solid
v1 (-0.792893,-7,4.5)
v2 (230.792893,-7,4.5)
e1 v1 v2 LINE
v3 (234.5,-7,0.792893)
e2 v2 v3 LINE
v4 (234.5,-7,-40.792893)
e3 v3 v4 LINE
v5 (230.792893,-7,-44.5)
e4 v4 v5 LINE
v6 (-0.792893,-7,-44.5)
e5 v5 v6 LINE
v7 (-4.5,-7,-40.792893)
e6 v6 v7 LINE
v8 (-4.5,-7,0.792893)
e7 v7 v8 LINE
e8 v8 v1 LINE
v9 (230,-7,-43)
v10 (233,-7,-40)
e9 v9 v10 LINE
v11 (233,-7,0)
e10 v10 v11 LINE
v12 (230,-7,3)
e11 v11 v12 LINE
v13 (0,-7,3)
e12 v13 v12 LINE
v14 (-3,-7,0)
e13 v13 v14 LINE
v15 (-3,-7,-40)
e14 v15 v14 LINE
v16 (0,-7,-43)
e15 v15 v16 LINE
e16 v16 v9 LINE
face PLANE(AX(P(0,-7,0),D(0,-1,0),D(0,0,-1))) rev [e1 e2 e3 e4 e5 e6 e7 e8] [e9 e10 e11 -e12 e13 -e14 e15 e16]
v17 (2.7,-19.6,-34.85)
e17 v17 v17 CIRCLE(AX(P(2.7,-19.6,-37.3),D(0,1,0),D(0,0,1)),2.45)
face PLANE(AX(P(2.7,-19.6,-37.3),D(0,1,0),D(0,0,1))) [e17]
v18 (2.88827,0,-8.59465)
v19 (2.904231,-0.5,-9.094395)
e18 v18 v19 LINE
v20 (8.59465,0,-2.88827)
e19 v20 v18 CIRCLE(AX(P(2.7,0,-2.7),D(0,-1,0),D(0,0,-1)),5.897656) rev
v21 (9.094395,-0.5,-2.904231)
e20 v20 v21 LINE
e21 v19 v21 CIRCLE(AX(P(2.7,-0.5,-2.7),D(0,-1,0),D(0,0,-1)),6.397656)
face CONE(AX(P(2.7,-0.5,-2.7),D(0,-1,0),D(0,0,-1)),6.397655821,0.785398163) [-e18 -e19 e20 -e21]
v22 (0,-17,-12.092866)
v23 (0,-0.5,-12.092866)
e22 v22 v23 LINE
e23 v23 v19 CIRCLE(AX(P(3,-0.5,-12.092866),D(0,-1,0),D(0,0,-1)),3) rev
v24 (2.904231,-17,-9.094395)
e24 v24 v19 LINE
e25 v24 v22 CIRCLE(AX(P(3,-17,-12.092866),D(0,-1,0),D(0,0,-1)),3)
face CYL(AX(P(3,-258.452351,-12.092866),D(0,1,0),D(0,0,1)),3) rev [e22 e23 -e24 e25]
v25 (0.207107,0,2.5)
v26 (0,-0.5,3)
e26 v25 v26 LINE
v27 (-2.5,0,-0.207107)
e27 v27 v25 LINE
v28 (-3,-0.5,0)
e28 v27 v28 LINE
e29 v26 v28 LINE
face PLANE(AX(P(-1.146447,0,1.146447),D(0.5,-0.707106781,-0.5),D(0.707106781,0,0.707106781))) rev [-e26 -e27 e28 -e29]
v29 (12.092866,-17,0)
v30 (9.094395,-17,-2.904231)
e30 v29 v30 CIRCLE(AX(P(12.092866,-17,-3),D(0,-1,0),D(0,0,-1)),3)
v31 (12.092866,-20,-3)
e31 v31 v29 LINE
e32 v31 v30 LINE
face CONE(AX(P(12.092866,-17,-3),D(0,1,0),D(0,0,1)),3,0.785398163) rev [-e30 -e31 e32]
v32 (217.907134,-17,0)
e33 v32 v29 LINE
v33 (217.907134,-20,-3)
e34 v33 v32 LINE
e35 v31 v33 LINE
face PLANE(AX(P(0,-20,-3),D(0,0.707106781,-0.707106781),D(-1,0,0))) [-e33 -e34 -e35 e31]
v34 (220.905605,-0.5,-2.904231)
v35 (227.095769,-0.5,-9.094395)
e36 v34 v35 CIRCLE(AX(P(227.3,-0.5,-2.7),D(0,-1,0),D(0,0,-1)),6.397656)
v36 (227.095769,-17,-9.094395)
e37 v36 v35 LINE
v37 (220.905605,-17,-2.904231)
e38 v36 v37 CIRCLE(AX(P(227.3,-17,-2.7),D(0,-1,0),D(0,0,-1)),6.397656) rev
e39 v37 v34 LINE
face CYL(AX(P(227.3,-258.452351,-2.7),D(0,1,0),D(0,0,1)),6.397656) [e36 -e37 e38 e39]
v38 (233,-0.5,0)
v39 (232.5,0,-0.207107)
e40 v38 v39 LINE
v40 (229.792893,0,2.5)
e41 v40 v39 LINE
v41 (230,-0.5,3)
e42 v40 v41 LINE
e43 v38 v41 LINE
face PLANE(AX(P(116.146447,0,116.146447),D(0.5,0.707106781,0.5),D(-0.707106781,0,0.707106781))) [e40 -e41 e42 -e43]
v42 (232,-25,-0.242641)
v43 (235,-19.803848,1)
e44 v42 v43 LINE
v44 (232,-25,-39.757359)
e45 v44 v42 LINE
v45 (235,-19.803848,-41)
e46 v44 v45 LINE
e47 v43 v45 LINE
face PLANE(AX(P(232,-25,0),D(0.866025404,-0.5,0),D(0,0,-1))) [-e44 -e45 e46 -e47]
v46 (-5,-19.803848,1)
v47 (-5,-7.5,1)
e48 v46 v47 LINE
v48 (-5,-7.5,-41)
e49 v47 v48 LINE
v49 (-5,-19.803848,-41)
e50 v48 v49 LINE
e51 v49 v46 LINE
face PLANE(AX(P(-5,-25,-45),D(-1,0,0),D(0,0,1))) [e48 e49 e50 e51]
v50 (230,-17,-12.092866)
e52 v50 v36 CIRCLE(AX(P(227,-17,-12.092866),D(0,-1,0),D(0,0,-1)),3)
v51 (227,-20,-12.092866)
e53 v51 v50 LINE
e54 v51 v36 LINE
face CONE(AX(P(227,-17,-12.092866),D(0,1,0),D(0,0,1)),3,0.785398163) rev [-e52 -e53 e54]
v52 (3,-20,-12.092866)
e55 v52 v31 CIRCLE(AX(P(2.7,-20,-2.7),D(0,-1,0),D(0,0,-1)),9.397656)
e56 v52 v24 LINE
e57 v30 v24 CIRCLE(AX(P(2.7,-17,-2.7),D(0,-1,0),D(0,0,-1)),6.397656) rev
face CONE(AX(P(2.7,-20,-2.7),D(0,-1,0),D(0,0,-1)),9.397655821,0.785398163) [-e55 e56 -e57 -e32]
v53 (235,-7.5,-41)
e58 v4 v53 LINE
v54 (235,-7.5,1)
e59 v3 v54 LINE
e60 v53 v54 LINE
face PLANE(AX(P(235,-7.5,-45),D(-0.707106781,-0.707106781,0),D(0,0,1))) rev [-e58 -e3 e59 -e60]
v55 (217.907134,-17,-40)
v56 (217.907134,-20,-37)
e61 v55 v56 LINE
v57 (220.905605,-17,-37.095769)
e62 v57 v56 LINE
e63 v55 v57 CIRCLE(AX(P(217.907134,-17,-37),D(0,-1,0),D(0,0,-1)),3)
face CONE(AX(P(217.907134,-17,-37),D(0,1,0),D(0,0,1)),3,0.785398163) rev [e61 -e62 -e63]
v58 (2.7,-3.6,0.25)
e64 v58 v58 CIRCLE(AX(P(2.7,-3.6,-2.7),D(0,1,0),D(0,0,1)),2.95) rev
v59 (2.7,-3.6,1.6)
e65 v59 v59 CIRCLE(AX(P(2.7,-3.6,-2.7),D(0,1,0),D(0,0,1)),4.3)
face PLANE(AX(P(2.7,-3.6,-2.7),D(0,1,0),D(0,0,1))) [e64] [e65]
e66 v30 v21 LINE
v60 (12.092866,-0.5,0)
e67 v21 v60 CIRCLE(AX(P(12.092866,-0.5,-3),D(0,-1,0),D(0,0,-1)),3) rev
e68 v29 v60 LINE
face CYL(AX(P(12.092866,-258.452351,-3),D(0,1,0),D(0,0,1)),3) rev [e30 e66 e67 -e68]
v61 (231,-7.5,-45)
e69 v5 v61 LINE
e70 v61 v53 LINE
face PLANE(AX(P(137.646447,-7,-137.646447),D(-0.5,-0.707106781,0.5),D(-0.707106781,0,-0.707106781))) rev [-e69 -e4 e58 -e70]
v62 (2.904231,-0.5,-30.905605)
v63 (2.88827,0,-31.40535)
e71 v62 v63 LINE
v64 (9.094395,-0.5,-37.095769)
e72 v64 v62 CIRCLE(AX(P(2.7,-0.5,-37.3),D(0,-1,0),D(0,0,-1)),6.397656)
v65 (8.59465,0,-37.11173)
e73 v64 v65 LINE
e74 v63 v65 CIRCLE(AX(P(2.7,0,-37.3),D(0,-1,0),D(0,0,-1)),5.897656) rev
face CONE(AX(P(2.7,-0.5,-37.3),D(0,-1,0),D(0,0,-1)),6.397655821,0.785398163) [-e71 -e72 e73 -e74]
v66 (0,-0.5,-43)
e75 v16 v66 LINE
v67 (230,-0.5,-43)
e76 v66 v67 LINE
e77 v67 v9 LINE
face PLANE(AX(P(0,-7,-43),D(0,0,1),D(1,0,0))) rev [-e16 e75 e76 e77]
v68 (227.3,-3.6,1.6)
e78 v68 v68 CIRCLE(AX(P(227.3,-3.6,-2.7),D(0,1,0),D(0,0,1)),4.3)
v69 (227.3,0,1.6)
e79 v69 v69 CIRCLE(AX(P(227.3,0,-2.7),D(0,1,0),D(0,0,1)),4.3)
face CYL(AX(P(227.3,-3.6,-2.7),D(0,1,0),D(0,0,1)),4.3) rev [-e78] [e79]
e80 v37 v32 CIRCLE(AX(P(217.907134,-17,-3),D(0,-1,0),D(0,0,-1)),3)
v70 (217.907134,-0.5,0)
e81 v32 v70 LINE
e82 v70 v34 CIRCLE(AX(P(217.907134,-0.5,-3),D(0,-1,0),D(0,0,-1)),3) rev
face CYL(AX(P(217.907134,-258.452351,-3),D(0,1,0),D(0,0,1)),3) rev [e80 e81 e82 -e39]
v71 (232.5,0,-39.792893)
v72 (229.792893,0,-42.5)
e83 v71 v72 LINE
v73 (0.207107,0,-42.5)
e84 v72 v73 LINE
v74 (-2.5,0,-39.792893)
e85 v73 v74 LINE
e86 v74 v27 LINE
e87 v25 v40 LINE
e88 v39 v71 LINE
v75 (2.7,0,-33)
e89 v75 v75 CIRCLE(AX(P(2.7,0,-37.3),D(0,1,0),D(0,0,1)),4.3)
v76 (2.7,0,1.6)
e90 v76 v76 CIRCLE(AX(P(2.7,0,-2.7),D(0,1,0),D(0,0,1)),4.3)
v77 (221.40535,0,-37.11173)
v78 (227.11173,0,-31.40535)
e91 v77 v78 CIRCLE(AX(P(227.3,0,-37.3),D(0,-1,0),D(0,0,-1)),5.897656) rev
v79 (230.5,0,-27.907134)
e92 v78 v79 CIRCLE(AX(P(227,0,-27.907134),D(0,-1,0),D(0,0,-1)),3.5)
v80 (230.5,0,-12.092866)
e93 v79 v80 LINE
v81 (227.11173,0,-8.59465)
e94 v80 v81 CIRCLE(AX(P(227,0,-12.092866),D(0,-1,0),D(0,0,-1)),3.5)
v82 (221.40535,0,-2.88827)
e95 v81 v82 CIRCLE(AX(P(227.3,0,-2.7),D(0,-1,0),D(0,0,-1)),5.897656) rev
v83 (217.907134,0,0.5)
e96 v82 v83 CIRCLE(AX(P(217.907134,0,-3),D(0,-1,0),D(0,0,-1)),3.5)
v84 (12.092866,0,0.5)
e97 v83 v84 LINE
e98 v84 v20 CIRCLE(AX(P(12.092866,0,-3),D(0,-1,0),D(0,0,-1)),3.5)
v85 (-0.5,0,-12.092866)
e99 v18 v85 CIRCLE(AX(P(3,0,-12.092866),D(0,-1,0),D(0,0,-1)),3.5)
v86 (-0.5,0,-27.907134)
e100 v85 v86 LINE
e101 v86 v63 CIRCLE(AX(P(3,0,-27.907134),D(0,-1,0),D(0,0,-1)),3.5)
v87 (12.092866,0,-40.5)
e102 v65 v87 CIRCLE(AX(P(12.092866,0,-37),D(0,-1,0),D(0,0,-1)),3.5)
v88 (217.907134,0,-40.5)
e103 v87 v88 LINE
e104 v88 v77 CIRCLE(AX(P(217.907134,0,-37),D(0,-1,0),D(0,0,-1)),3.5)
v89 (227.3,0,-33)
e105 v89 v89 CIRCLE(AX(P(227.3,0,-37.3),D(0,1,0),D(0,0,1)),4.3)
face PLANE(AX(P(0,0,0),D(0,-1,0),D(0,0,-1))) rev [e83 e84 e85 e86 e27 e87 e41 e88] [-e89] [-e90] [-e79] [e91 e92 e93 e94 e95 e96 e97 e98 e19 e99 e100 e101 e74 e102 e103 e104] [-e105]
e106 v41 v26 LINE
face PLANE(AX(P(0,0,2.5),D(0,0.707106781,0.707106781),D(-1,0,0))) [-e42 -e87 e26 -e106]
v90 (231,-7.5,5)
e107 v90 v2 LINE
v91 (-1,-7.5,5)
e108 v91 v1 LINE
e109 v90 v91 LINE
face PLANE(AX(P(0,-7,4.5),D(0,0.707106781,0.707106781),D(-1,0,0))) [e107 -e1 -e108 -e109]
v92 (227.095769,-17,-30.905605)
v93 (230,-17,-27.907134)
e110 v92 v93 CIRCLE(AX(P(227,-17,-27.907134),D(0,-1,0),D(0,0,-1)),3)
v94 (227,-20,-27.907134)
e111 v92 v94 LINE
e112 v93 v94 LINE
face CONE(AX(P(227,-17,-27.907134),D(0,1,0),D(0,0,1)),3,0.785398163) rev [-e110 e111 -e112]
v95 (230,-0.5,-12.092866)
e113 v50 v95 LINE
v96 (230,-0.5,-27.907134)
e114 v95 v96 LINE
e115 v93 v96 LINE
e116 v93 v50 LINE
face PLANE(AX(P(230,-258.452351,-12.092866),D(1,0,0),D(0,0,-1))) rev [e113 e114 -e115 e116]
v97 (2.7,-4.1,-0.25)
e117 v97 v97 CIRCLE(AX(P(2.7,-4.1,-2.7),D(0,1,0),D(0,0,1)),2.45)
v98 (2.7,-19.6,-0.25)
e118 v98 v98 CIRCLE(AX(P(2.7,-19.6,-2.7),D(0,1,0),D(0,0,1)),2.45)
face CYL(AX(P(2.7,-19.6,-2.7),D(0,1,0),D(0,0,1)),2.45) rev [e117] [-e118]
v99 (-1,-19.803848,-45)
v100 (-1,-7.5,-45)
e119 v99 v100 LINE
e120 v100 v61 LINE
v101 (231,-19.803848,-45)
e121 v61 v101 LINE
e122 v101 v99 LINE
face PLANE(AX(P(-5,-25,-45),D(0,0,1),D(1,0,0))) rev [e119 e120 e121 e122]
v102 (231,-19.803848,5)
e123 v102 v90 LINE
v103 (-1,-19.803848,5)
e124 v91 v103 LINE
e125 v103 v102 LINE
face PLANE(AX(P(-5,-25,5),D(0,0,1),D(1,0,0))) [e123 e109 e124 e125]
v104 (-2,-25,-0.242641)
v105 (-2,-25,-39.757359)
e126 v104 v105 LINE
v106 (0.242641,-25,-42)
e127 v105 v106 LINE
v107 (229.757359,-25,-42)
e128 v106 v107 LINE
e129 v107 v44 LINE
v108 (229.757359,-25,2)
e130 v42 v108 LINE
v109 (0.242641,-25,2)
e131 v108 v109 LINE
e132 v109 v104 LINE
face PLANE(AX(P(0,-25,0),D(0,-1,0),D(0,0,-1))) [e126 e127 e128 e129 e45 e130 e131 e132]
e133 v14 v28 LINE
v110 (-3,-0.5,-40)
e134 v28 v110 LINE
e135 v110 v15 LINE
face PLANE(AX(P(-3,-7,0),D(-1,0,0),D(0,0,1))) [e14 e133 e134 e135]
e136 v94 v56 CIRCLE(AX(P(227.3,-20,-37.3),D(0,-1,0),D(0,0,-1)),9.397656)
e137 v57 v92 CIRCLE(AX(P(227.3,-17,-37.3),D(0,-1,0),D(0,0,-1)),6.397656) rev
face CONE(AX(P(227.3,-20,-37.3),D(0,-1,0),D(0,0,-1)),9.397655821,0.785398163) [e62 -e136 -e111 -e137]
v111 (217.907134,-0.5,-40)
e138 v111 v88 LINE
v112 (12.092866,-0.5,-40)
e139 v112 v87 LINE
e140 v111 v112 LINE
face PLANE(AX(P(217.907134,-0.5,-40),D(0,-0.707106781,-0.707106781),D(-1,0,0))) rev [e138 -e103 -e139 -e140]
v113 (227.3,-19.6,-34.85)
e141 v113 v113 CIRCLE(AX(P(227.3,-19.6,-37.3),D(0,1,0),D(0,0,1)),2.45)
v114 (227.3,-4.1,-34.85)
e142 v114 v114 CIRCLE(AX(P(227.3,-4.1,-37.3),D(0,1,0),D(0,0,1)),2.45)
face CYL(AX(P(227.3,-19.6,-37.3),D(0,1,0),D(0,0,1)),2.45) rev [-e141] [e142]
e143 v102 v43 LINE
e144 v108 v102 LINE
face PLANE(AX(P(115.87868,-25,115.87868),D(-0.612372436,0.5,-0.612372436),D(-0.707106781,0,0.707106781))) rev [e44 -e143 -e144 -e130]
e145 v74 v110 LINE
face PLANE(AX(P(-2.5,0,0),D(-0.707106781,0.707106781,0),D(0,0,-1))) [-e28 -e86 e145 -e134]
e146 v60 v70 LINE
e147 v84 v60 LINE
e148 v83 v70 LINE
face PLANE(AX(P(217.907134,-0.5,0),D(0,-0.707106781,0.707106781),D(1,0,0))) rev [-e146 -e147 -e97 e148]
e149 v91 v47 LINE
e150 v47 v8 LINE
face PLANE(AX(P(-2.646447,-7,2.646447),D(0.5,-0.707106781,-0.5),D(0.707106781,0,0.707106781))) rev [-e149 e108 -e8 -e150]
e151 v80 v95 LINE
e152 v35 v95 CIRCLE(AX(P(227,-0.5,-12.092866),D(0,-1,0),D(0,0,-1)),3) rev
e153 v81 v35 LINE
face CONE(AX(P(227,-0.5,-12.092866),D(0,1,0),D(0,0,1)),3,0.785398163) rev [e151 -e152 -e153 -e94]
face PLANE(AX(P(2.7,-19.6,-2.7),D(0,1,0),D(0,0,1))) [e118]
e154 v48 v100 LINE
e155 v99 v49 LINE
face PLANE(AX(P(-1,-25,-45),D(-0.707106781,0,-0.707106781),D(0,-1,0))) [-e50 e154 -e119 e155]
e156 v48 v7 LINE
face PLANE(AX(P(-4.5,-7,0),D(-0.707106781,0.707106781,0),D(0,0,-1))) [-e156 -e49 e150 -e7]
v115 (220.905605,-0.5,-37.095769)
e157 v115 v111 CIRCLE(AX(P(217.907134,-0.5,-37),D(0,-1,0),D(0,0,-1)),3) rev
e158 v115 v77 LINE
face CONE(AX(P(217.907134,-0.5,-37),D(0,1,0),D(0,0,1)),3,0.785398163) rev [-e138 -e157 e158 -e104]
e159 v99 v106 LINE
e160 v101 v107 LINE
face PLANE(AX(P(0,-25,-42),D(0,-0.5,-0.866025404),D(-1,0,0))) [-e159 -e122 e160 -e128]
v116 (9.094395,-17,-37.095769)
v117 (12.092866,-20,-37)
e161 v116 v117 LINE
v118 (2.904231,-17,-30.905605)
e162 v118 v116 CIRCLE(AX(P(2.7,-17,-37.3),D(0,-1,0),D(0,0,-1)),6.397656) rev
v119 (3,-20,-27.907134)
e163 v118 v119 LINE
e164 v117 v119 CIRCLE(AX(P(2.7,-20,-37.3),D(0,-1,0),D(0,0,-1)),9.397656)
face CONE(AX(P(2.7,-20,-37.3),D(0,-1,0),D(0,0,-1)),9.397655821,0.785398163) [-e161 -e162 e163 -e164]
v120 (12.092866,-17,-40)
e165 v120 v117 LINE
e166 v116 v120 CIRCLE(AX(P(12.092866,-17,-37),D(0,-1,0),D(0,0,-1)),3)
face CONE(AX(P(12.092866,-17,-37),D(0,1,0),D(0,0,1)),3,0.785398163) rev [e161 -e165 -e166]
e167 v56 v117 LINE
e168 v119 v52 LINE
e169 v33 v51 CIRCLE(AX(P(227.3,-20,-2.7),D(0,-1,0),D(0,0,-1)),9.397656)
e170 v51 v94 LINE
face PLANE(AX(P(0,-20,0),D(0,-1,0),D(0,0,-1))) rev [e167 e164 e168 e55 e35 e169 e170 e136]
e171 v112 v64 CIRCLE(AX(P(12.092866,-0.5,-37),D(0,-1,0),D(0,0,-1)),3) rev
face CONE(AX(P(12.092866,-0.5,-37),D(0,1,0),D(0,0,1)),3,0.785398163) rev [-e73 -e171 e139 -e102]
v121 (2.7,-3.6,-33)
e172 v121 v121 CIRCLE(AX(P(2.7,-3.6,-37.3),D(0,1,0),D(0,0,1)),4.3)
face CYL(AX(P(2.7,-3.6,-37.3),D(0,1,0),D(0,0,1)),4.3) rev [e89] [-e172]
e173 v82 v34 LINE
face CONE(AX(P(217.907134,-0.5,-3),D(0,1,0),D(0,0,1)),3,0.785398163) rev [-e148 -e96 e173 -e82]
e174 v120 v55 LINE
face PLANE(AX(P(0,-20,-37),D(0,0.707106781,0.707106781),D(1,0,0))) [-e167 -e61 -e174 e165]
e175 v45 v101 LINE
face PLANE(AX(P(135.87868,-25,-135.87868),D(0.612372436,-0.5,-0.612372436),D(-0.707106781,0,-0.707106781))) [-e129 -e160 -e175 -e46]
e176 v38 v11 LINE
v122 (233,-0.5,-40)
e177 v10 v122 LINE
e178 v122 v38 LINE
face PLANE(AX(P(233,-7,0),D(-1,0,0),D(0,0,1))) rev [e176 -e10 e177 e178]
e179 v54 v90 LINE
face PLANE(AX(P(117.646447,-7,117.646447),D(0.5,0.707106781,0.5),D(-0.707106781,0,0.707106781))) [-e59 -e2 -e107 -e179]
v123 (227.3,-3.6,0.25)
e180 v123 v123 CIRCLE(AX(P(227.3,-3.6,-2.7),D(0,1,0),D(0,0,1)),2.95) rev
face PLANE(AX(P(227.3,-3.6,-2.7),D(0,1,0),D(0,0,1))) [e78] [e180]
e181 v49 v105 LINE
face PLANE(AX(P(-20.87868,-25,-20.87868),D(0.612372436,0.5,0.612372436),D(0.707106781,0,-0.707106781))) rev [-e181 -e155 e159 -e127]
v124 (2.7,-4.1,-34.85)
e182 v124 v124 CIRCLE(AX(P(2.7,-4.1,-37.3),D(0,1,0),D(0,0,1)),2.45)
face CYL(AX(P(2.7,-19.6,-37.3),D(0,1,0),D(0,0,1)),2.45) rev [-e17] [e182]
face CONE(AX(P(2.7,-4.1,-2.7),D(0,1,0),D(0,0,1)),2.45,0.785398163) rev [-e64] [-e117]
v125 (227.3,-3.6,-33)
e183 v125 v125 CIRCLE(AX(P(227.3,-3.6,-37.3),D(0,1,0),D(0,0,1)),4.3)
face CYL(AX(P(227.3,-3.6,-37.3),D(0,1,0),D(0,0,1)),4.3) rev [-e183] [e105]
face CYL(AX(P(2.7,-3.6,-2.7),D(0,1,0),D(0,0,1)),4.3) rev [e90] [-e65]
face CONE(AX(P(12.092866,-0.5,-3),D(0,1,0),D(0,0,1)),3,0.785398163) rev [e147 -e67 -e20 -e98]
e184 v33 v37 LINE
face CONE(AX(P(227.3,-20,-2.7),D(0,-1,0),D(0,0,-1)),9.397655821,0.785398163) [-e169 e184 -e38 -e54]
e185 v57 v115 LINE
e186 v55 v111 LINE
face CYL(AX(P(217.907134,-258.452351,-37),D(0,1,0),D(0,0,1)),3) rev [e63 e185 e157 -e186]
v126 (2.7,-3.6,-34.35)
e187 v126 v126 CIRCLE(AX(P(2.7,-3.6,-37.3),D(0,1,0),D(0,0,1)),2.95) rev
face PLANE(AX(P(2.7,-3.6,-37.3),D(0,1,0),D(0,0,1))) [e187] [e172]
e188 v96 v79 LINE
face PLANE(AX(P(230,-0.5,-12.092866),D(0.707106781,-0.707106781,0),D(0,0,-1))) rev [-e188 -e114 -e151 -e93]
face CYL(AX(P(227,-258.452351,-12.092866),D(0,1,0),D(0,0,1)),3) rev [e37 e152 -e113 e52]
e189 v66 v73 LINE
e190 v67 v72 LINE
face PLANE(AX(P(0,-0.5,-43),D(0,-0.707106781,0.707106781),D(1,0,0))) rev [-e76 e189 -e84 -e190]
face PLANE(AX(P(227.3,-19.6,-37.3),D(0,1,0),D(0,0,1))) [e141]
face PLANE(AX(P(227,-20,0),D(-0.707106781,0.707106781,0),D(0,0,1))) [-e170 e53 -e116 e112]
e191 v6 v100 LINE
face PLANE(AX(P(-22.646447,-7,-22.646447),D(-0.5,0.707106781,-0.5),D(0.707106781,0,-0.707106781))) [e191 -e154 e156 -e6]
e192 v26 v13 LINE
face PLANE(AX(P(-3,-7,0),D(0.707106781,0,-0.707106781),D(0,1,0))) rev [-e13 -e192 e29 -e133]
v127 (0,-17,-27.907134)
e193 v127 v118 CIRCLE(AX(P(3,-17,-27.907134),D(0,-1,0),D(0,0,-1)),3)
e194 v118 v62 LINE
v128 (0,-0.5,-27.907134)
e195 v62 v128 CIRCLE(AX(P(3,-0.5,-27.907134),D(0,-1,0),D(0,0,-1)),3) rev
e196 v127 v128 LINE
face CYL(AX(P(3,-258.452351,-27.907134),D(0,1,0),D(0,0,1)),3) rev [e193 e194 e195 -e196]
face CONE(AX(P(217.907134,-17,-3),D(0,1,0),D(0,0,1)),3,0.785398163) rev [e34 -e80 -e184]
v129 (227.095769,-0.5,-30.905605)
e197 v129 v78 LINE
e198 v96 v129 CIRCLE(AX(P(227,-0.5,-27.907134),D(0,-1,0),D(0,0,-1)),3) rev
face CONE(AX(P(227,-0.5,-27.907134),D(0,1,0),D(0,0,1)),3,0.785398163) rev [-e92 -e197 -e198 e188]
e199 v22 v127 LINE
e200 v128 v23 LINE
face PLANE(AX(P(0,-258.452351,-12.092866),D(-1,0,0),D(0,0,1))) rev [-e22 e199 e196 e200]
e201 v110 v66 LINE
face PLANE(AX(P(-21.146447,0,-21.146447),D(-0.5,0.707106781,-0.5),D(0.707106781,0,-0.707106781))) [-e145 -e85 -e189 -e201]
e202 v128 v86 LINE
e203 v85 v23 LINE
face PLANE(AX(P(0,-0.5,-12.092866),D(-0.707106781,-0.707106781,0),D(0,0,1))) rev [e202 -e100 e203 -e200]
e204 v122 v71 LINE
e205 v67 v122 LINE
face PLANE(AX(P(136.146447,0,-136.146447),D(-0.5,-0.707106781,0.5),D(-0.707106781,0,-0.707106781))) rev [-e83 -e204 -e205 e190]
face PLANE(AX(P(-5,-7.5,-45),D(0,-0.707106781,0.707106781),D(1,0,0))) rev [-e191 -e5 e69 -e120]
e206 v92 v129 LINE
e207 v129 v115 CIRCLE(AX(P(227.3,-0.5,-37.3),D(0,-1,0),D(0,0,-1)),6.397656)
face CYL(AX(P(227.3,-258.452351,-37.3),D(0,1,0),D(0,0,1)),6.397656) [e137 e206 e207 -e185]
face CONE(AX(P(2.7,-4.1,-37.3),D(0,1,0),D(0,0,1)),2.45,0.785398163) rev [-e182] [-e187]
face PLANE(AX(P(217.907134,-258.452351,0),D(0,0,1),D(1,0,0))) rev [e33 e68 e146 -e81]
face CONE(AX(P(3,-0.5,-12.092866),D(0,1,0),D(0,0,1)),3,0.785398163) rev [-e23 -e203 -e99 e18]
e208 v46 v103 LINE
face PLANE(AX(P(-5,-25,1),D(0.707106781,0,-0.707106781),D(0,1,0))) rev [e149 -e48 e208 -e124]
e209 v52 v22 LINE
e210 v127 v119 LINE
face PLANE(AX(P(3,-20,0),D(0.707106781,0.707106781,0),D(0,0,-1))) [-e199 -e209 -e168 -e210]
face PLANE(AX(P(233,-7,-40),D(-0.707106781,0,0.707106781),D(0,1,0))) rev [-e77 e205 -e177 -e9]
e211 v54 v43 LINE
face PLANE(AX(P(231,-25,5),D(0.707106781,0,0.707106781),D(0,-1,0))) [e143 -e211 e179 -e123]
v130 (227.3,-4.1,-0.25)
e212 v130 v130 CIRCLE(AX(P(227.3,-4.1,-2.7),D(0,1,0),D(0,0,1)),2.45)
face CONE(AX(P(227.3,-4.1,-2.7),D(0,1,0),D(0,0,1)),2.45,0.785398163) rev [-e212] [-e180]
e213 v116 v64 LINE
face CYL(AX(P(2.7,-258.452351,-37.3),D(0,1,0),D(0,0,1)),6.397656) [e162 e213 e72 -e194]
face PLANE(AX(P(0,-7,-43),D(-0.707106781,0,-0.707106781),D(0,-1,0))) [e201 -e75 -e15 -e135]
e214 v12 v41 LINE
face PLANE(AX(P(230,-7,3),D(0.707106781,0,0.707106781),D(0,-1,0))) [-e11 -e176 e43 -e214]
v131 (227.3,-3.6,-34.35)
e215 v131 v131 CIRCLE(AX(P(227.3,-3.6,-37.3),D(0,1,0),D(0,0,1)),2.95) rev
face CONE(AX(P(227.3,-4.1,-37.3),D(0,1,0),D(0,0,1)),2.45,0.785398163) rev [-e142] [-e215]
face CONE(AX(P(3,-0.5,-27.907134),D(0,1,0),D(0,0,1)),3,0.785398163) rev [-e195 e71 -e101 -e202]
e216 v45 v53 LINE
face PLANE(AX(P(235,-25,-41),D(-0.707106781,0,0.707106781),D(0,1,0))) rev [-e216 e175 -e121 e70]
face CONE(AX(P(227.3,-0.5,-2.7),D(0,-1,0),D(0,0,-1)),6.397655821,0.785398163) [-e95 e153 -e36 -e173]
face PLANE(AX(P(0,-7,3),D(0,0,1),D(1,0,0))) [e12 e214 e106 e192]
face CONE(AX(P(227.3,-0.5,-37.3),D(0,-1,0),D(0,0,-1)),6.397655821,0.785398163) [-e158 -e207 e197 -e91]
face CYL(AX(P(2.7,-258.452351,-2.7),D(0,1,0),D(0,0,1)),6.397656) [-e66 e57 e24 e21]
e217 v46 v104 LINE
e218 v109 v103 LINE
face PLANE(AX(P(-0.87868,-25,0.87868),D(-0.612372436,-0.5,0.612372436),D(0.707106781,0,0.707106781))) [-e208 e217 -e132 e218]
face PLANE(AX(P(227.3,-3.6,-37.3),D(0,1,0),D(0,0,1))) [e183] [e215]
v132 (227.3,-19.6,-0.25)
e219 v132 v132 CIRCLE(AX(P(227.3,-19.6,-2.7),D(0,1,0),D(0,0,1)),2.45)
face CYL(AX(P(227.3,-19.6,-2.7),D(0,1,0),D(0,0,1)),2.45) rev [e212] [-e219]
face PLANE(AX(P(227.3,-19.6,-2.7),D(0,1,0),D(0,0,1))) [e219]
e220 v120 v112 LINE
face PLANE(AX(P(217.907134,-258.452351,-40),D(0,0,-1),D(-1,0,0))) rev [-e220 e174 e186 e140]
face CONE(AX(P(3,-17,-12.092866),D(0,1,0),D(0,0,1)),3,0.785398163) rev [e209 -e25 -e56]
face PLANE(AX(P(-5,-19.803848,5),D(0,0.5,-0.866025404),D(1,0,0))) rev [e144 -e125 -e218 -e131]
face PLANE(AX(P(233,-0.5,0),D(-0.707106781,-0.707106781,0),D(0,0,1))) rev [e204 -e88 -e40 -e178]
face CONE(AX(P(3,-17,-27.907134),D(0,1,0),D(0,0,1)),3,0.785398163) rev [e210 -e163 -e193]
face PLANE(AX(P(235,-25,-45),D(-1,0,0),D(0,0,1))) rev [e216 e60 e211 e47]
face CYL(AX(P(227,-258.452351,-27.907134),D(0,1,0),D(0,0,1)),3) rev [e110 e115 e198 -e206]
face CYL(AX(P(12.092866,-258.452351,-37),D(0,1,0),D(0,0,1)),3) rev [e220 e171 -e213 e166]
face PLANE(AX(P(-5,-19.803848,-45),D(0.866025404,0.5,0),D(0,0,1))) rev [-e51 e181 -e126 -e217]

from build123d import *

# Parameters (mm, degrees)
SKETCH1_W             = 240
SKETCH1_H             = 50
BOSS_EXTRUDE1_DEPTH   = 25
SKETCH6_OUTSIDE_W     = 291.284
SKETCH6_OUTSIDE_H     = 101.284
SKETCH6_OUTSIDE_W_2   = 236
SKETCH6_OUTSIDE_H_2   = 46
CUT_EXTRUDE3_DEPTH    = 7
CHAMFER6_SIZE         = 3
CHAMFER5_SIZE         = 4
SKETCH6_9_OUTSIDE_W   = 291.284
SKETCH6_9_OUTSIDE_H   = 101.284
SKETCH6_9_OUTSIDE_W_2 = 236
SKETCH6_9_OUTSIDE_H_2 = 46
SKETCH6_9_OUTSIDE_R   = 4.3
CUT_EXTRUDE5_DEPTH    = 3.6
SKETCH16_R            = 2.45
CUT_EXTRUDE10_DEPTH   = 16
CHAMFER8_SIZE         = 0.5
CHAMFER9_SIZE         = 3
CHAMFER9_SIZE2        = 5.196152423
CHAMFER11_SIZE        = 0.5
CHAMFER12_SIZE        = 0.5
CUT_EXTRUDE11_DEPTH   = 20
CHAMFER13_SIZE        = 0.5
CHAMFER14_SIZE        = 3


with BuildPart() as part:
    # Sketch1 → Boss-Extrude1 (new body)
    with BuildSketch(Plane(origin=(0, 0, 0), x_dir=(1, 0, 0), z_dir=(0, 1, 0))):
        with Locations((115, 20)):
            Rectangle(SKETCH1_W, SKETCH1_H)
    extrude(amount=-BOSS_EXTRUDE1_DEPTH)

    # Sketch6 outside → Cut-Extrude3 (cut)
    with BuildSketch(Plane(origin=(0, 0, 0), x_dir=(1, 0, 0), z_dir=(0, 1, 0))):
        with Locations((115, 20)):
            Rectangle(SKETCH6_OUTSIDE_W, SKETCH6_OUTSIDE_H)
        with Locations((115, 20)):
            Rectangle(SKETCH6_OUTSIDE_W_2, SKETCH6_OUTSIDE_H_2, mode=Mode.SUBTRACT)
    extrude(amount=-CUT_EXTRUDE3_DEPTH, mode=Mode.SUBTRACT)

    # Chamfer6
    chamfer6_edges = [part.edges().sort_by_distance(p)[0] for p in [
        (-3, -3.5, -43),
        (233, -3.5, -43),
        (233, -3.5, 3),
        (-3, -3.5, 3),
    ]]
    chamfer(chamfer6_edges, length=CHAMFER6_SIZE)

    # Chamfer5
    chamfer5_edges = [part.edges().sort_by_distance(p)[0] for p in [
        (-5, -16, 5),
        (-5, -16, -45),
        (235, -16, -45),
        (235, -16, 5),
    ]]
    chamfer(chamfer5_edges, length=CHAMFER5_SIZE)

    # Sketch6<9> outside → Cut-Extrude5 (cut)
    # profile 1 of 5: a face of its own
    with BuildSketch(Plane(origin=(0, 0, 0), x_dir=(1, 0, 0), z_dir=(0, 1, 0))):
        with Locations((115, 20)):
            Rectangle(SKETCH6_9_OUTSIDE_W, SKETCH6_9_OUTSIDE_H)
        with Locations((115, 20)):
            Rectangle(SKETCH6_9_OUTSIDE_W_2, SKETCH6_9_OUTSIDE_H_2, mode=Mode.SUBTRACT)
    # profile 2 of 5: a face of its own
    with BuildSketch(Plane(origin=(0, 0, 0), x_dir=(1, 0, 0), z_dir=(0, 1, 0))):
        with Locations(Location((2.7, 37.3, 0), (0, 0, 270))):
            Circle(SKETCH6_9_OUTSIDE_R)
    # profile 3 of 5: a face of its own
    with BuildSketch(Plane(origin=(0, 0, 0), x_dir=(1, 0, 0), z_dir=(0, 1, 0))):
        with Locations(Location((227.3, 37.3, 0), (0, 0, 270))):
            Circle(SKETCH6_9_OUTSIDE_R)
    # profile 4 of 5: a face of its own
    with BuildSketch(Plane(origin=(0, 0, 0), x_dir=(1, 0, 0), z_dir=(0, 1, 0))):
        with Locations(Location((227.3, 2.7, 0), (0, 0, 270))):
            Circle(SKETCH6_9_OUTSIDE_R)
    # profile 5 of 5: a face of its own
    with BuildSketch(Plane(origin=(0, 0, 0), x_dir=(1, 0, 0), z_dir=(0, 1, 0))):
        with Locations(Location((2.7, 2.7, 0), (0, 0, 270))):
            Circle(SKETCH6_9_OUTSIDE_R)
    extrude(amount=-CUT_EXTRUDE5_DEPTH, mode=Mode.SUBTRACT)

    # Sketch16 → Cut-Extrude10 (cut)
    with BuildSketch(Plane(origin=(0, -3.6, 0), x_dir=(1, 0, 0), z_dir=(0, 1, 0))):
        with Locations(Location((2.7, 2.7, 0), (0, 0, 270))):
            Circle(SKETCH16_R)
        with Locations(Location((2.7, 37.3, 0), (0, 0, 270))):
            Circle(SKETCH16_R)
        with Locations(Location((227.3, 37.3, 0), (0, 0, 270))):
            Circle(SKETCH16_R)
        with Locations(Location((227.3, 2.7, 0), (0, 0, 270))):
            Circle(SKETCH16_R)
    extrude(amount=-CUT_EXTRUDE10_DEPTH, mode=Mode.SUBTRACT)

    # Chamfer8
    chamfer8_edges = [part.edges().sort_by_distance(p)[0] for p in [
        (227.3, -3.6, -5.15),
        (227.3, -3.6, -39.75),
        (2.7, -3.6, -39.75),
        (2.7, -3.6, -5.15),
    ]]
    chamfer(chamfer8_edges, length=CHAMFER8_SIZE)

    # Chamfer9
    chamfer9_edges = [part.edges().sort_by_distance(p)[0] for p in [
        (115, -25, -45),
        (-5, -25, -20),
        (115, -25, 5),
        (235, -25, -20),
        (233, -25, -43),
        (233, -25, 3),
        (-3, -25, 3),
        (-3, -25, -43),
    ]]
    chamfer9_side = [part.faces().sort_by_distance(p)[0] for p in [
        (115, -25, -20),
    ]]
    chamfer(chamfer9_edges, length=CHAMFER9_SIZE, length2=CHAMFER9_SIZE2, reference=chamfer9_side[0])

    # Chamfer11
    chamfer11_edges = [part.edges().sort_by_distance(p)[0] for p in [
        (115, 0, 3),
        (-3, 0, -20),
        (233, 0, -20),
        (115, 0, -43),
        (-1.5, 0, 1.5),
        (-1.5, 0, -41.5),
        (231.5, 0, -41.5),
        (231.5, 0, 1.5),
    ]]
    chamfer(chamfer11_edges, length=CHAMFER11_SIZE)

    # Chamfer12
    chamfer12_edges = [part.edges().sort_by_distance(p)[0] for p in [
        (115, -7, -45),
        (115, -7, 5),
        (235, -7, -20),
        (-5, -7, -20),
        (233, -7, -43),
        (233, -7, 3),
        (-3, -7, 3),
        (-3, -7, -43),
    ]]
    chamfer(chamfer12_edges, length=CHAMFER12_SIZE)

    # Sketch18 → Cut-Extrude11 (cut)
    with BuildSketch(Plane(origin=(0, 0, 0), x_dir=(1, 0, 0), z_dir=(0, 1, 0))):
        with BuildLine():
            Line((230, 12.092866172), (230, 27.907133828))
            ThreePointArc((230, 27.907133828), (229.154913652, 29.994320249), (227.095768564, 30.905604835))
            ThreePointArc((227.095768564, 30.905604835), (222.776174185, 32.776174185), (220.905604835, 37.095768564))
            ThreePointArc((220.905604835, 37.095768564), (219.994320249, 39.154913652), (217.907133828, 40))
            Line((217.907133828, 40), (12.092866172, 40))
            ThreePointArc((12.092866172, 40), (10.005679751, 39.154913652), (9.094395165, 37.095768564))
            ThreePointArc((9.094395165, 37.095768564), (7.223825815, 32.776174185), (2.904231436, 30.905604835))
            ThreePointArc((2.904231436, 30.905604835), (0.845086348, 29.994320249), (0, 27.907133828))
            Line((0, 27.907133828), (0, 12.092866172))
            ThreePointArc((0, 12.092866172), (0.845086348, 10.005679751), (2.904231436, 9.094395165))
            ThreePointArc((2.904231436, 9.094395165), (7.223825815, 7.223825815), (9.094395165, 2.904231436))
            ThreePointArc((9.094395165, 2.904231436), (10.005679751, 0.845086348), (12.092866172, 0))
            Line((12.092866172, 0), (217.907133828, 0))
            ThreePointArc((217.907133828, 0), (219.994320249, 0.845086348), (220.905604835, 2.904231436))
            ThreePointArc((220.905604835, 2.904231436), (222.776174185, 7.223825815), (227.095768564, 9.094395165))
            ThreePointArc((227.095768564, 9.094395165), (229.154913652, 10.005679751), (230, 12.092866172))
        make_face()
    extrude(amount=-CUT_EXTRUDE11_DEPTH, mode=Mode.SUBTRACT)

    # Chamfer13
    chamfer13_edges = [part.edges().sort_by_distance(p)[0] for p in [
        (229.154913652, 0, -29.994320249),
        (222.776174185, 0, -32.776174185),
        (219.994320249, 0, -39.154913652),
        (115, 0, -40),
        (10.005679751, 0, -39.154913652),
        (7.223825815, 0, -32.776174185),
        (0.845086348, 0, -29.994320249),
        (0, 0, -20),
        (0.845086348, 0, -10.005679751),
        (7.223825815, 0, -7.223825815),
        (10.005679751, 0, -0.845086348),
        (115, 0, 0),
        (219.994320249, 0, -0.845086348),
        (222.776174185, 0, -7.223825815),
        (229.154913652, 0, -10.005679751),
        (230, 0, -20),
    ]]
    chamfer(chamfer13_edges, length=CHAMFER13_SIZE)

    # Chamfer14
    chamfer14_edges = [part.edges().sort_by_distance(p)[0] for p in [
        (222.776174185, -20, -32.776174185),
        (219.994320249, -20, -39.154913652),
        (115, -20, -40),
        (10.005679751, -20, -39.154913652),
        (7.223825815, -20, -32.776174185),
        (0.845086348, -20, -29.994320249),
        (0, -20, -20),
        (0.845086348, -20, -10.005679751),
        (7.223825815, -20, -7.223825815),
        (10.005679751, -20, -0.845086348),
        (115, -20, 0),
        (219.994320249, -20, -0.845086348),
        (222.776174185, -20, -7.223825815),
        (229.154913652, -20, -10.005679751),
        (230, -20, -20),
        (229.154913652, -20, -29.994320249),
    ]]
    chamfer(chamfer14_edges, length=CHAMFER14_SIZE - 0.0001)  # a hair under: the kernel refuses the full size


solid = part.part
